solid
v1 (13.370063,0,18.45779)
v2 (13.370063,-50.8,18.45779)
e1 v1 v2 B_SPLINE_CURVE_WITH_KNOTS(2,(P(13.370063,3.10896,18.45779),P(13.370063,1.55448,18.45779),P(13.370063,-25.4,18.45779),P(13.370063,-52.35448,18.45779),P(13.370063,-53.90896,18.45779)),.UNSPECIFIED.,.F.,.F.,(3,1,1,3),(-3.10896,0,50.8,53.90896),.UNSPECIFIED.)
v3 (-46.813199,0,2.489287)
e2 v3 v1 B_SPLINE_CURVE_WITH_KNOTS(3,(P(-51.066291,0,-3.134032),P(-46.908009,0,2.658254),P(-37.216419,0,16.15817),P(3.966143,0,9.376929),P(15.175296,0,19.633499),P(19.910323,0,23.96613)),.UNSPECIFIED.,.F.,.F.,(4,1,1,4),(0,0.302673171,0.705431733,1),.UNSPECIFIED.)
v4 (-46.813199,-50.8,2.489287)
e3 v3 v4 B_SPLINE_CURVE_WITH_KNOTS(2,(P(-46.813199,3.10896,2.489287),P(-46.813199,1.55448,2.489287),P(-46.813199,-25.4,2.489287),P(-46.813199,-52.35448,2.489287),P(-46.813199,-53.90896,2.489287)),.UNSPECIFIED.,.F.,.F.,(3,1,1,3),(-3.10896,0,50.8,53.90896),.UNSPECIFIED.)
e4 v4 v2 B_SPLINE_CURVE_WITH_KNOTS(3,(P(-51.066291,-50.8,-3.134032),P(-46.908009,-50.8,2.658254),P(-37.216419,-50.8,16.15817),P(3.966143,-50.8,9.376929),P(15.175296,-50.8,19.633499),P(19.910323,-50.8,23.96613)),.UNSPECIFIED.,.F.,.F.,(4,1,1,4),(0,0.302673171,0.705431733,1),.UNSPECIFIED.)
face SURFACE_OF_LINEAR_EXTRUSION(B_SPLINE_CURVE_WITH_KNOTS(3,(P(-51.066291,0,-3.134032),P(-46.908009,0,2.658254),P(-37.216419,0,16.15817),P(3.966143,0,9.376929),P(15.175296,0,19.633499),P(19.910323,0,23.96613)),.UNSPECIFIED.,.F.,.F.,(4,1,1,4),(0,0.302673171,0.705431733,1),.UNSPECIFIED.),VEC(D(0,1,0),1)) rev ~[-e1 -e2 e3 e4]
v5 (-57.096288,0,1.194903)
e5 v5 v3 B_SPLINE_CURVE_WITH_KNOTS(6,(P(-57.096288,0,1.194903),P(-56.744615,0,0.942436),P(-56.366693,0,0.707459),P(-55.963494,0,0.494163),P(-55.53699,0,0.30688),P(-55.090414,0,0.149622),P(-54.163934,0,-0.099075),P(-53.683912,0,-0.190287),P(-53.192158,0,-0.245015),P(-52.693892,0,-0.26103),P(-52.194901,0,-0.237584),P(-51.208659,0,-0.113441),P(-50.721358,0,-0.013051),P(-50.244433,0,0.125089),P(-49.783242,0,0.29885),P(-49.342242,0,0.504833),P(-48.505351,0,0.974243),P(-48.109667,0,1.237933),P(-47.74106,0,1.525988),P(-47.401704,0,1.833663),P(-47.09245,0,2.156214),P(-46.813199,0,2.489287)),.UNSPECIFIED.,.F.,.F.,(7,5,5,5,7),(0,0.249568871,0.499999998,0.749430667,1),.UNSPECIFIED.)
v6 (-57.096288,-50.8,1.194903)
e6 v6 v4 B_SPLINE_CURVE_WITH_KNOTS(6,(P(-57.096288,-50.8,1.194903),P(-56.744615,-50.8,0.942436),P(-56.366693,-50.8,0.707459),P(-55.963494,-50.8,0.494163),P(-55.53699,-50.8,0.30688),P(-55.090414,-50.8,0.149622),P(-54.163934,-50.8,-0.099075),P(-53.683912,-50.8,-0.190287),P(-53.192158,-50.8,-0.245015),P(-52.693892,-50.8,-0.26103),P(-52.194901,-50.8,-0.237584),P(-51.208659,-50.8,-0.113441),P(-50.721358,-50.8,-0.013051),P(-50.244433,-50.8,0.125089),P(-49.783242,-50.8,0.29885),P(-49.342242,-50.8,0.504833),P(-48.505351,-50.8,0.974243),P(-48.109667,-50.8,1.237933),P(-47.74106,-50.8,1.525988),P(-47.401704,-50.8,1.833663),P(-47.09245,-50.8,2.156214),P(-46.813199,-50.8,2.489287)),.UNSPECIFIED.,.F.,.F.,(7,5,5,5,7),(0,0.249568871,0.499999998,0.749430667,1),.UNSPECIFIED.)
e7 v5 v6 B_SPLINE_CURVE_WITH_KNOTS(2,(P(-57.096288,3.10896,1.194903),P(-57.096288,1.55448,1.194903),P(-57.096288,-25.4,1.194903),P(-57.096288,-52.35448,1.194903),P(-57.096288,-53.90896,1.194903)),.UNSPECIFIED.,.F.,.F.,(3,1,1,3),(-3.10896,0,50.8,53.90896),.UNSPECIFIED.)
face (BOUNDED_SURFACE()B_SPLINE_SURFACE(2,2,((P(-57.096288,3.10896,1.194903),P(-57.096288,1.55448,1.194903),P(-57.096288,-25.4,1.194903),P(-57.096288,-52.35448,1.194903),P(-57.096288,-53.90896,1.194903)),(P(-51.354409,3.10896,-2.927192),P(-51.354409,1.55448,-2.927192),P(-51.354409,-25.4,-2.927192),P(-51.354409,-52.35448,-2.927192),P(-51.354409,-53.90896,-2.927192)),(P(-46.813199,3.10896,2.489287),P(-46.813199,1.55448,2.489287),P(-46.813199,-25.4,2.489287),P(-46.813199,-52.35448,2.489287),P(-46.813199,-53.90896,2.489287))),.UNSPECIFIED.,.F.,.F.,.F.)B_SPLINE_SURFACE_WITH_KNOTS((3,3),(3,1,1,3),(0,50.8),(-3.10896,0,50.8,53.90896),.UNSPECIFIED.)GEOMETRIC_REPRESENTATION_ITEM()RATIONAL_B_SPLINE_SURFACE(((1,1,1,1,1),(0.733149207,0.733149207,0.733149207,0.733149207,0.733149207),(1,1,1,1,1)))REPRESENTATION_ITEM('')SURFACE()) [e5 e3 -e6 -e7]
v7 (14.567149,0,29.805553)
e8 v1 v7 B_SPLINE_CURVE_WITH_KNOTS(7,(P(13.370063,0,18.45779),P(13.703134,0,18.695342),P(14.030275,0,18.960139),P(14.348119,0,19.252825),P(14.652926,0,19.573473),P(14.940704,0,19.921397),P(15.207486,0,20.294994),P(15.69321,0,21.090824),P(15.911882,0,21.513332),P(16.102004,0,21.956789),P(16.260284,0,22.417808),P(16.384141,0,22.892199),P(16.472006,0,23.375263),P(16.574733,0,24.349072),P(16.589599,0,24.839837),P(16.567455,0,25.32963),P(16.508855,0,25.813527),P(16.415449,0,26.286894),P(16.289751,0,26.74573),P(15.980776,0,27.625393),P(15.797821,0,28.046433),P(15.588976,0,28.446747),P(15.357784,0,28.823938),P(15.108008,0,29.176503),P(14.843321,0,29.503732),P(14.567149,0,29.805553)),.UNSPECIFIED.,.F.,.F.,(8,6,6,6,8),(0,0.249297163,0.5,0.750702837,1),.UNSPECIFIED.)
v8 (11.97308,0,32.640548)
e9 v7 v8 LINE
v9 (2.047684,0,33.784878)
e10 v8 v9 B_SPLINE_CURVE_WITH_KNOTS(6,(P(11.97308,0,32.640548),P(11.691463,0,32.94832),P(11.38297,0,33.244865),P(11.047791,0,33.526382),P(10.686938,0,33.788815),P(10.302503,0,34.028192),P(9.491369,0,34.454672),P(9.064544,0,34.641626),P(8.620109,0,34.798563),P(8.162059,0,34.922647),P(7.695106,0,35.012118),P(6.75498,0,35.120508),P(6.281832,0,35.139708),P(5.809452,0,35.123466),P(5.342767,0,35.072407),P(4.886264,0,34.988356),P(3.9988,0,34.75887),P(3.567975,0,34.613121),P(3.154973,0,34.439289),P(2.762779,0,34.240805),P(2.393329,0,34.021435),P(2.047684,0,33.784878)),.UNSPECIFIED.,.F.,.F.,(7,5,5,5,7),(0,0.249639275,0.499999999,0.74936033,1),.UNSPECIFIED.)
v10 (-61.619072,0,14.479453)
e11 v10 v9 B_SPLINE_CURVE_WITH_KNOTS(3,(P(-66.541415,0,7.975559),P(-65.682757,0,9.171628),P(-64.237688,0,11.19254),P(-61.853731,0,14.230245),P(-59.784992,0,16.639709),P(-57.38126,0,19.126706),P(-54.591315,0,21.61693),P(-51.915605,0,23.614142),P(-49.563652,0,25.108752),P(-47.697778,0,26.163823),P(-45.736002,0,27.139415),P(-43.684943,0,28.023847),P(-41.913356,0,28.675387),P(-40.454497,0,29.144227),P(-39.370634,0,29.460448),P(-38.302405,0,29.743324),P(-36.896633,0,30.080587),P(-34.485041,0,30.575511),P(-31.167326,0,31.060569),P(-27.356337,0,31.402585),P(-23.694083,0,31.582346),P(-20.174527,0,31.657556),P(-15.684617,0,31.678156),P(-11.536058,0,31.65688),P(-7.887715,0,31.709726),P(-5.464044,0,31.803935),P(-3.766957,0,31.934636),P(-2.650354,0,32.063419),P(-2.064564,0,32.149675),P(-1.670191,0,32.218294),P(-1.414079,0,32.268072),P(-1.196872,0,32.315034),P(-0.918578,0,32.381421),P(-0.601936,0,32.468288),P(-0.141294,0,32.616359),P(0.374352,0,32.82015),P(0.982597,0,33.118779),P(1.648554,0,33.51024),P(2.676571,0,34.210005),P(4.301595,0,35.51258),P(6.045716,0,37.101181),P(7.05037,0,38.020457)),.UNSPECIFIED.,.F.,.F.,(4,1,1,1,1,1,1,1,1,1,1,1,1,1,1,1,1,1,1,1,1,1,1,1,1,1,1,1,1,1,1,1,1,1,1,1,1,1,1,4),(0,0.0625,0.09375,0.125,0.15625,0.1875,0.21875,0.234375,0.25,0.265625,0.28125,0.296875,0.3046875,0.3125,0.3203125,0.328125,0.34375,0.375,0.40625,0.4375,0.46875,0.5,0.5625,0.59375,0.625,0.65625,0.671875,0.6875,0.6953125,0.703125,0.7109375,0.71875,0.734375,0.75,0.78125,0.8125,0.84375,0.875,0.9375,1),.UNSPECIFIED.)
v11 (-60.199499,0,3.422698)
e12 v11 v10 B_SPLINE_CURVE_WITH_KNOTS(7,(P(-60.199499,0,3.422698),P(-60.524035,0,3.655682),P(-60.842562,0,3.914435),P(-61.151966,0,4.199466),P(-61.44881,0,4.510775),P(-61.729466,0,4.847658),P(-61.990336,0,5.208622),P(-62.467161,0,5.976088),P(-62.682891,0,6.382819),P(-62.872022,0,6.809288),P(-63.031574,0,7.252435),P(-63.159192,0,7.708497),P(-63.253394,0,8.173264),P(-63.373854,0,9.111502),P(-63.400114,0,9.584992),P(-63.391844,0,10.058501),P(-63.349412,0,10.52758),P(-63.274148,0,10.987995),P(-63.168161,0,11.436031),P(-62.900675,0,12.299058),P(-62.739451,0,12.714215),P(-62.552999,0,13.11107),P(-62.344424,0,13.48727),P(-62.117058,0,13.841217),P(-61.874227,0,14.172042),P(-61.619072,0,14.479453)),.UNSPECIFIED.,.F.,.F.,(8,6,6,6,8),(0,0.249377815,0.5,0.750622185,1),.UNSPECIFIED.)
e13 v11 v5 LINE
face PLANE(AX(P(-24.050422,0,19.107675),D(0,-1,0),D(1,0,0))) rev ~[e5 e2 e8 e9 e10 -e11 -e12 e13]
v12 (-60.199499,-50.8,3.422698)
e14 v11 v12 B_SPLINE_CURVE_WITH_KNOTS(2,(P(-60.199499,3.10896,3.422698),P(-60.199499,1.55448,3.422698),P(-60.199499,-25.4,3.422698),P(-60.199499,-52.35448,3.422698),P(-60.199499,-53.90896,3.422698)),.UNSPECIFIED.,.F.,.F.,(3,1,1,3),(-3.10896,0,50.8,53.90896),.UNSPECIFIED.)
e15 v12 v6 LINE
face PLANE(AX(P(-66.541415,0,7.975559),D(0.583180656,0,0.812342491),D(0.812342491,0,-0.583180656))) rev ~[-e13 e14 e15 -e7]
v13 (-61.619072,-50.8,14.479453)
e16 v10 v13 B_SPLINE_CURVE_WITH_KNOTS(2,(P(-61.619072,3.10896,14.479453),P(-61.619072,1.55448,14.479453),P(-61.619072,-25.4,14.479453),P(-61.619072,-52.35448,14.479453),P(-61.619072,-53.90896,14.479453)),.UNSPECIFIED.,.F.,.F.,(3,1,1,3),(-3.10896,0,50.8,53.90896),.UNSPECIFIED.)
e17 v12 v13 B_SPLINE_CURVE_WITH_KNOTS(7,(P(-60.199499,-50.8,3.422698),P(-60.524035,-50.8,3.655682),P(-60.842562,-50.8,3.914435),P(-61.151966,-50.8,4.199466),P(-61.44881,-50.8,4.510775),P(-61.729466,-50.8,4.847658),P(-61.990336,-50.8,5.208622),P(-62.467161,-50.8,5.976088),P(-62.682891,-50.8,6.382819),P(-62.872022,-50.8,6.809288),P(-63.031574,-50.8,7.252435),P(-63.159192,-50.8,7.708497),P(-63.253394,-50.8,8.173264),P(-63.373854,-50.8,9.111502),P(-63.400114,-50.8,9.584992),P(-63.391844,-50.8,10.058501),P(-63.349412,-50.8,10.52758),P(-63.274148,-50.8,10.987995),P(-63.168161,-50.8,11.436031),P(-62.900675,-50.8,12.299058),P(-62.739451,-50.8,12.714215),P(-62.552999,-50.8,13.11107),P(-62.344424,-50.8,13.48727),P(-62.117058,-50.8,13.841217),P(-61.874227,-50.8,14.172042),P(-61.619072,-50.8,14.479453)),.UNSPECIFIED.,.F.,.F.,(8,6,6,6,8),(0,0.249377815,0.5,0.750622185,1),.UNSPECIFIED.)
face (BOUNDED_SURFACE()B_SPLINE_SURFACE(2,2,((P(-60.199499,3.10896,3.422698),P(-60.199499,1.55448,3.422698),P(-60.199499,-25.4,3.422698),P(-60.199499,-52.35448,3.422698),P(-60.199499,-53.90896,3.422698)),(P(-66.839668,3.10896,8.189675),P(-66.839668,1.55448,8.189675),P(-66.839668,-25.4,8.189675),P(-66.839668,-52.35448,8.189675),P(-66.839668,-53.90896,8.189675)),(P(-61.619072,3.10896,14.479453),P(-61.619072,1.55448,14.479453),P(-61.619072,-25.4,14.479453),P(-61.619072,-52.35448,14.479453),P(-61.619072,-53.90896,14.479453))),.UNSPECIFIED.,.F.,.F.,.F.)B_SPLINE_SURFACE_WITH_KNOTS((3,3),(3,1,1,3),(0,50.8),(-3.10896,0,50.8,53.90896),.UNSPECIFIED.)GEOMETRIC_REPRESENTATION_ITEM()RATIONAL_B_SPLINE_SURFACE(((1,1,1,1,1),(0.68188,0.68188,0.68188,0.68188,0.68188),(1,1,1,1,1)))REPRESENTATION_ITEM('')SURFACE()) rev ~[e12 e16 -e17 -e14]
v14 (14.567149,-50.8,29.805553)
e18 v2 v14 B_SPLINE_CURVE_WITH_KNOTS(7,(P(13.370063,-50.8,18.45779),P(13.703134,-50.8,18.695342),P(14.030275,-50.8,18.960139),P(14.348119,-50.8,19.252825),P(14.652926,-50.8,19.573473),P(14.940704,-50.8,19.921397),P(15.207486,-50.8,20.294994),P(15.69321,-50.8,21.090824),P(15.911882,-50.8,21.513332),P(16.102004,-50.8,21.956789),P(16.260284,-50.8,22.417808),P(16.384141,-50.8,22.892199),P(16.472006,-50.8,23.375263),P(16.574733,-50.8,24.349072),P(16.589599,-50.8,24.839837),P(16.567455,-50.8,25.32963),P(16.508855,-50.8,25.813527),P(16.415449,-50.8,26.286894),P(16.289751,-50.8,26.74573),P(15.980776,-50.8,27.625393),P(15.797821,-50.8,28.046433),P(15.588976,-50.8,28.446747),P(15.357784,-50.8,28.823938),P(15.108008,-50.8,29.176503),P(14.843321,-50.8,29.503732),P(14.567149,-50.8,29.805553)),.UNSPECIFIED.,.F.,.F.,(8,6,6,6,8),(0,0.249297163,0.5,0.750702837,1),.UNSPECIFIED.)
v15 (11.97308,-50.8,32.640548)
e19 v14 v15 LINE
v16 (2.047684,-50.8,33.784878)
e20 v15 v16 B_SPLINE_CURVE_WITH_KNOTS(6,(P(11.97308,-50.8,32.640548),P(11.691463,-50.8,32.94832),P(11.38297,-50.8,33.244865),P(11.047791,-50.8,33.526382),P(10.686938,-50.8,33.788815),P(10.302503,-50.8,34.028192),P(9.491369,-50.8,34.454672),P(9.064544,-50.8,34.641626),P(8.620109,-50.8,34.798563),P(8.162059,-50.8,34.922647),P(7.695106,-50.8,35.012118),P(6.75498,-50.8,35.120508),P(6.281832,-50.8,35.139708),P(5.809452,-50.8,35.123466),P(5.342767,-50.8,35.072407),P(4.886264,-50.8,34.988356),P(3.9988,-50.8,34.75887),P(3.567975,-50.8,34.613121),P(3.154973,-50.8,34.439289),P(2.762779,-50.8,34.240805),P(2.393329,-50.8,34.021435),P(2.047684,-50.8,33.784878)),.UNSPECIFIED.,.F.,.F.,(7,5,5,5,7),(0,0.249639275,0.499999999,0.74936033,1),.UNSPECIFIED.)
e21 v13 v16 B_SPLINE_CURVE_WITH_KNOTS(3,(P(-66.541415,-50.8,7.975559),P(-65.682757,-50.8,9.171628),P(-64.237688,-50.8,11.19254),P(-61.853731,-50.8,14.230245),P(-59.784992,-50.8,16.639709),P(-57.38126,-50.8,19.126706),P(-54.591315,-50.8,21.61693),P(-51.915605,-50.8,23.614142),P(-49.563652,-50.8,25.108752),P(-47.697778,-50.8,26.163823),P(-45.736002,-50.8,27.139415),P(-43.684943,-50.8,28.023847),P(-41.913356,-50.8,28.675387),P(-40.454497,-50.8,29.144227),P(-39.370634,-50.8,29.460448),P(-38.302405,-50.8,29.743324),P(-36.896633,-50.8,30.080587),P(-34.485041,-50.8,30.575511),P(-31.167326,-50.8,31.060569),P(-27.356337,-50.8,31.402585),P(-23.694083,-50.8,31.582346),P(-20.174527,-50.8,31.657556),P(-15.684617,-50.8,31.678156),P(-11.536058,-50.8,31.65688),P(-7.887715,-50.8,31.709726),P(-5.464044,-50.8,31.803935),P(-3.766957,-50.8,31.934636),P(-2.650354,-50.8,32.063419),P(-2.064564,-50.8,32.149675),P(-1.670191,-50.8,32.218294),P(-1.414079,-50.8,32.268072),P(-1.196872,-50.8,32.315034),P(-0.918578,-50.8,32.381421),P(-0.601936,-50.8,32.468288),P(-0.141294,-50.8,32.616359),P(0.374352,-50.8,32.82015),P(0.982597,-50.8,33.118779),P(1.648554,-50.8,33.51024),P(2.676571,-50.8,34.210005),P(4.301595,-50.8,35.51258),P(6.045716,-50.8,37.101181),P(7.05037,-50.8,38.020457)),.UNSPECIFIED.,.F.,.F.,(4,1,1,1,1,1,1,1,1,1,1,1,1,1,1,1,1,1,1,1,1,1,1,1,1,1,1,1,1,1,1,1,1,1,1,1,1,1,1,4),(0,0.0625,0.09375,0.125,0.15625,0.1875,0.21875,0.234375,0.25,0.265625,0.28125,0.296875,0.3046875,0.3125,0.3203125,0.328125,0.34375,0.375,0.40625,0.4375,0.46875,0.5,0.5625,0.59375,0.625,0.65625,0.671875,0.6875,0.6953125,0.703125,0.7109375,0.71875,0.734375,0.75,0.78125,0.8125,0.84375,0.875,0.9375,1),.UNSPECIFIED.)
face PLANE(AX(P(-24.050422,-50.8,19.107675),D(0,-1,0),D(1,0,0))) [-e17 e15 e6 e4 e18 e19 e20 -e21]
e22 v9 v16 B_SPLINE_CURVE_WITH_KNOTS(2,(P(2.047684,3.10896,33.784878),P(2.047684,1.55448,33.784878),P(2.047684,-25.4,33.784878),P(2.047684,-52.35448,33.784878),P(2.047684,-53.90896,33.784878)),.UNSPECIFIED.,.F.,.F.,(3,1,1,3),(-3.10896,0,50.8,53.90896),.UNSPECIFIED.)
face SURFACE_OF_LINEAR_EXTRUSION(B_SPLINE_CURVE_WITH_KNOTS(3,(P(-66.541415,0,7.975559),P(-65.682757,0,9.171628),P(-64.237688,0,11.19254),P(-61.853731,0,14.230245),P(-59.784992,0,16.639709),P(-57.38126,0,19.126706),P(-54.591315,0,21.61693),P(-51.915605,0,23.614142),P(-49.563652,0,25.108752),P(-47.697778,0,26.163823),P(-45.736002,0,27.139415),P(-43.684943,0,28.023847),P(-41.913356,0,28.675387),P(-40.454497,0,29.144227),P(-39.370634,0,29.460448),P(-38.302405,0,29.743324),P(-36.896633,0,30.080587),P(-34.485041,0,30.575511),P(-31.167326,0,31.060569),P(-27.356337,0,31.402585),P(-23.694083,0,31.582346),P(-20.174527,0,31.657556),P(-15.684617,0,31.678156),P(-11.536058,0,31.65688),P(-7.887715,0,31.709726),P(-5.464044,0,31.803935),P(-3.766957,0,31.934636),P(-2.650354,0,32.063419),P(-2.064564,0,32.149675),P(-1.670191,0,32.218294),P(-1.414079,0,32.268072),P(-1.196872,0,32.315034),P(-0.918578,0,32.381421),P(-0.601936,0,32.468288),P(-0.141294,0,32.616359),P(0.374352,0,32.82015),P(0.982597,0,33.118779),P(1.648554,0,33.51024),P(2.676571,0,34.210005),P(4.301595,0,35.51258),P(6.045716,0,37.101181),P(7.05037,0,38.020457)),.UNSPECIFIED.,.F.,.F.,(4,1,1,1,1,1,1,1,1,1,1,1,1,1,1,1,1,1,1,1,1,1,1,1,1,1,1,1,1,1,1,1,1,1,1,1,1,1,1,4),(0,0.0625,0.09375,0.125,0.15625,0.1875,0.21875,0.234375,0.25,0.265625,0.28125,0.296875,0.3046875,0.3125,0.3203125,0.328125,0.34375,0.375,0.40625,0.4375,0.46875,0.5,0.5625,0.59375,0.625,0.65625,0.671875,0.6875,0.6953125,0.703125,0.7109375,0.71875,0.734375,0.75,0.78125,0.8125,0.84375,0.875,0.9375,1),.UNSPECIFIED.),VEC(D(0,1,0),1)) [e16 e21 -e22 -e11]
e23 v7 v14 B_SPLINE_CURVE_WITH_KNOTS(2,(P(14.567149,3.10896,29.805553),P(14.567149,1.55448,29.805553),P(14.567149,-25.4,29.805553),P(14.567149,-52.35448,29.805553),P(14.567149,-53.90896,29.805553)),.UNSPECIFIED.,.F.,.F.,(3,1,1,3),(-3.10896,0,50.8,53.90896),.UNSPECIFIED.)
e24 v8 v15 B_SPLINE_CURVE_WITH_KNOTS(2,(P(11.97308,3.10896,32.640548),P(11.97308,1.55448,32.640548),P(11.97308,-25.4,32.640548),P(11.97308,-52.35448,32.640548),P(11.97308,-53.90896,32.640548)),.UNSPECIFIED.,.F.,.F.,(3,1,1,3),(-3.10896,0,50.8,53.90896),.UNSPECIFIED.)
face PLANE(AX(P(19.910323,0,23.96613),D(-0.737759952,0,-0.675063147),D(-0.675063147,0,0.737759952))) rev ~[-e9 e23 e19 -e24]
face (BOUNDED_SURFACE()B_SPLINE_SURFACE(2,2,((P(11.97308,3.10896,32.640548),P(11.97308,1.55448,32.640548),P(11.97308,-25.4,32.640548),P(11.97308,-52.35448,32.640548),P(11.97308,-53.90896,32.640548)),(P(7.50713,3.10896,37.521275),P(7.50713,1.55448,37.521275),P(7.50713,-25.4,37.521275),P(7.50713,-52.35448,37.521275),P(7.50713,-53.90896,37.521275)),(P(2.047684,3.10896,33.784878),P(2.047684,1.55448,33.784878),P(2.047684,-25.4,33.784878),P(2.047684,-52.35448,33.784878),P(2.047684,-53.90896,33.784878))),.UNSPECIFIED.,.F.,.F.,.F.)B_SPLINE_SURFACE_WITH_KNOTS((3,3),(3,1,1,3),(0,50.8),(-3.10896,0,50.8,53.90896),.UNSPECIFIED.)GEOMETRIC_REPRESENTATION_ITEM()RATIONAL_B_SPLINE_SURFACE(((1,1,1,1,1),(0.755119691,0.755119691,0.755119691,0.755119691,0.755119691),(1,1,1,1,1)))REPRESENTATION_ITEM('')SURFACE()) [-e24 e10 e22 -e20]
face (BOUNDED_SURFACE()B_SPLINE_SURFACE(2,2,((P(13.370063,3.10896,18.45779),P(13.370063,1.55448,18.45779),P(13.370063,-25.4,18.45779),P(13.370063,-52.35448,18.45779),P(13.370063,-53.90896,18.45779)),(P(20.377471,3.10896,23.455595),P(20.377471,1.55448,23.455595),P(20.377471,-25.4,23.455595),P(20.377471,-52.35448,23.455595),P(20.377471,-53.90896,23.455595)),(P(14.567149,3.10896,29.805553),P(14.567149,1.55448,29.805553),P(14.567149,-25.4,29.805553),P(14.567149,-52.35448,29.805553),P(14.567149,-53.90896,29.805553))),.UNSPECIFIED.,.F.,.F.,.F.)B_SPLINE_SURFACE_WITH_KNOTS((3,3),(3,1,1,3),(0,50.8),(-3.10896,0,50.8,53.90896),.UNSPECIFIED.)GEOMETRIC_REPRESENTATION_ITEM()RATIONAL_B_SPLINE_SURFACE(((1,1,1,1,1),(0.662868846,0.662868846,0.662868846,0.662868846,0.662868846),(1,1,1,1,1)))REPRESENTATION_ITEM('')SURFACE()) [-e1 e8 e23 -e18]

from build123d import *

# Parameters (mm, degrees)
F1_DEPTH = 50.8
F2_R     = 7.62


# Not quite as in the source:
# - the dataset's text gives a spline's control points without its knots; the knots are read off the source's solid


with BuildPart() as f1:
    # F0 (on Front) → F1 (new body)
    with BuildSketch(Plane.XZ):
        with BuildLine():
            Line((-66.5414150367, 7.9755592532), (-51.0662905872, -3.1340322457))
            add(Edge.make_bspline(
                [(-51.0662905872, -3.1340322457), (-46.9080086103, 2.6582537348), (-37.2164193187, 16.158169588), (3.9661427847, 9.376928998), (15.1752961857, 19.6334986968), (19.9103225023, 23.9661298692)],
                knots=[0, 0, 0, 0, 0.302673171, 0.7054317335, 1, 1, 1, 1], degree=3))
            Line((19.9103225023, 23.9661298692), (7.0503695481, 38.0204569615))
            add(Edge.make_bspline(
                [(-66.5414150367, 7.9755592532), (-65.6827574204, 9.1716278461), (-64.2376881581, 11.1925403484), (-61.8537311601, 14.230245381), (-59.7849919212, 16.6397090343), (-57.3812599932, 19.1267056888), (-54.5913152498, 21.616929755), (-51.9156052216, 23.6141415002), (-49.5636524979, 25.1087524342), (-47.6977784369, 26.1638231657), (-45.7360020225, 27.1394154139), (-43.6849425957, 28.0238468654), (-41.9133563994, 28.6753866943), (-40.4544972877, 29.1442267499), (-39.3706343495, 29.4604482596), (-38.3024046597, 29.7433243724), (-36.8966327798, 30.0805873366), (-34.4850412565, 30.5755105454), (-31.1673262141, 31.0605685349), (-27.3563371493, 31.4025851529), (-23.6940833425, 31.582346389), (-20.1745271825, 31.65755623), (-15.6846174083, 31.6781564731), (-11.5360581226, 31.6568797923), (-7.8877151981, 31.7097261242), (-5.4640436851, 31.8039348118), (-3.7669566424, 31.9346358754), (-2.6503542293, 32.0634185934), (-2.0645638727, 32.1496749584), (-1.6701914585, 32.2182935913), (-1.4140790271, 32.2680724783), (-1.1968720881, 32.3150339788), (-0.9185781733, 32.3814206056), (-0.6019359075, 32.4682882445), (-0.1412938907, 32.6163591904), (0.3743523739, 32.8201499972), (0.9825969287, 33.1187793404), (1.6485537837, 33.510239909), (2.6765705542, 34.2100049696), (4.3015951848, 35.5125797753), (6.0457156922, 37.1011812653), (7.0503695481, 38.0204569615)],
                knots=[0, 0, 0, 0, 0.0625, 0.09375, 0.125, 0.15625, 0.1875, 0.21875, 0.234375, 0.25, 0.265625, 0.28125, 0.296875, 0.3046875, 0.3125, 0.3203125, 0.328125, 0.34375, 0.375, 0.40625, 0.4375, 0.46875, 0.5, 0.5625, 0.59375, 0.625, 0.65625, 0.671875, 0.6875, 0.6953125, 0.703125, 0.7109375, 0.71875, 0.734375, 0.75, 0.78125, 0.8125, 0.84375, 0.875, 0.9375, 1, 1, 1, 1], degree=3))
        make_face()
    extrude(amount=F1_DEPTH)

    # F2
    f2_edges = [f1.edges().sort_by_distance(p)[0] for p in [
        (7.05037, -25.4, 38.020457),
        (19.910323, -25.4, 23.96613),
        (-66.541415, -25.4, 7.975559),
        (-51.066291, -25.4, -3.134032),
    ]]
    fillet(f2_edges, radius=F2_R)


solid = f1.part
